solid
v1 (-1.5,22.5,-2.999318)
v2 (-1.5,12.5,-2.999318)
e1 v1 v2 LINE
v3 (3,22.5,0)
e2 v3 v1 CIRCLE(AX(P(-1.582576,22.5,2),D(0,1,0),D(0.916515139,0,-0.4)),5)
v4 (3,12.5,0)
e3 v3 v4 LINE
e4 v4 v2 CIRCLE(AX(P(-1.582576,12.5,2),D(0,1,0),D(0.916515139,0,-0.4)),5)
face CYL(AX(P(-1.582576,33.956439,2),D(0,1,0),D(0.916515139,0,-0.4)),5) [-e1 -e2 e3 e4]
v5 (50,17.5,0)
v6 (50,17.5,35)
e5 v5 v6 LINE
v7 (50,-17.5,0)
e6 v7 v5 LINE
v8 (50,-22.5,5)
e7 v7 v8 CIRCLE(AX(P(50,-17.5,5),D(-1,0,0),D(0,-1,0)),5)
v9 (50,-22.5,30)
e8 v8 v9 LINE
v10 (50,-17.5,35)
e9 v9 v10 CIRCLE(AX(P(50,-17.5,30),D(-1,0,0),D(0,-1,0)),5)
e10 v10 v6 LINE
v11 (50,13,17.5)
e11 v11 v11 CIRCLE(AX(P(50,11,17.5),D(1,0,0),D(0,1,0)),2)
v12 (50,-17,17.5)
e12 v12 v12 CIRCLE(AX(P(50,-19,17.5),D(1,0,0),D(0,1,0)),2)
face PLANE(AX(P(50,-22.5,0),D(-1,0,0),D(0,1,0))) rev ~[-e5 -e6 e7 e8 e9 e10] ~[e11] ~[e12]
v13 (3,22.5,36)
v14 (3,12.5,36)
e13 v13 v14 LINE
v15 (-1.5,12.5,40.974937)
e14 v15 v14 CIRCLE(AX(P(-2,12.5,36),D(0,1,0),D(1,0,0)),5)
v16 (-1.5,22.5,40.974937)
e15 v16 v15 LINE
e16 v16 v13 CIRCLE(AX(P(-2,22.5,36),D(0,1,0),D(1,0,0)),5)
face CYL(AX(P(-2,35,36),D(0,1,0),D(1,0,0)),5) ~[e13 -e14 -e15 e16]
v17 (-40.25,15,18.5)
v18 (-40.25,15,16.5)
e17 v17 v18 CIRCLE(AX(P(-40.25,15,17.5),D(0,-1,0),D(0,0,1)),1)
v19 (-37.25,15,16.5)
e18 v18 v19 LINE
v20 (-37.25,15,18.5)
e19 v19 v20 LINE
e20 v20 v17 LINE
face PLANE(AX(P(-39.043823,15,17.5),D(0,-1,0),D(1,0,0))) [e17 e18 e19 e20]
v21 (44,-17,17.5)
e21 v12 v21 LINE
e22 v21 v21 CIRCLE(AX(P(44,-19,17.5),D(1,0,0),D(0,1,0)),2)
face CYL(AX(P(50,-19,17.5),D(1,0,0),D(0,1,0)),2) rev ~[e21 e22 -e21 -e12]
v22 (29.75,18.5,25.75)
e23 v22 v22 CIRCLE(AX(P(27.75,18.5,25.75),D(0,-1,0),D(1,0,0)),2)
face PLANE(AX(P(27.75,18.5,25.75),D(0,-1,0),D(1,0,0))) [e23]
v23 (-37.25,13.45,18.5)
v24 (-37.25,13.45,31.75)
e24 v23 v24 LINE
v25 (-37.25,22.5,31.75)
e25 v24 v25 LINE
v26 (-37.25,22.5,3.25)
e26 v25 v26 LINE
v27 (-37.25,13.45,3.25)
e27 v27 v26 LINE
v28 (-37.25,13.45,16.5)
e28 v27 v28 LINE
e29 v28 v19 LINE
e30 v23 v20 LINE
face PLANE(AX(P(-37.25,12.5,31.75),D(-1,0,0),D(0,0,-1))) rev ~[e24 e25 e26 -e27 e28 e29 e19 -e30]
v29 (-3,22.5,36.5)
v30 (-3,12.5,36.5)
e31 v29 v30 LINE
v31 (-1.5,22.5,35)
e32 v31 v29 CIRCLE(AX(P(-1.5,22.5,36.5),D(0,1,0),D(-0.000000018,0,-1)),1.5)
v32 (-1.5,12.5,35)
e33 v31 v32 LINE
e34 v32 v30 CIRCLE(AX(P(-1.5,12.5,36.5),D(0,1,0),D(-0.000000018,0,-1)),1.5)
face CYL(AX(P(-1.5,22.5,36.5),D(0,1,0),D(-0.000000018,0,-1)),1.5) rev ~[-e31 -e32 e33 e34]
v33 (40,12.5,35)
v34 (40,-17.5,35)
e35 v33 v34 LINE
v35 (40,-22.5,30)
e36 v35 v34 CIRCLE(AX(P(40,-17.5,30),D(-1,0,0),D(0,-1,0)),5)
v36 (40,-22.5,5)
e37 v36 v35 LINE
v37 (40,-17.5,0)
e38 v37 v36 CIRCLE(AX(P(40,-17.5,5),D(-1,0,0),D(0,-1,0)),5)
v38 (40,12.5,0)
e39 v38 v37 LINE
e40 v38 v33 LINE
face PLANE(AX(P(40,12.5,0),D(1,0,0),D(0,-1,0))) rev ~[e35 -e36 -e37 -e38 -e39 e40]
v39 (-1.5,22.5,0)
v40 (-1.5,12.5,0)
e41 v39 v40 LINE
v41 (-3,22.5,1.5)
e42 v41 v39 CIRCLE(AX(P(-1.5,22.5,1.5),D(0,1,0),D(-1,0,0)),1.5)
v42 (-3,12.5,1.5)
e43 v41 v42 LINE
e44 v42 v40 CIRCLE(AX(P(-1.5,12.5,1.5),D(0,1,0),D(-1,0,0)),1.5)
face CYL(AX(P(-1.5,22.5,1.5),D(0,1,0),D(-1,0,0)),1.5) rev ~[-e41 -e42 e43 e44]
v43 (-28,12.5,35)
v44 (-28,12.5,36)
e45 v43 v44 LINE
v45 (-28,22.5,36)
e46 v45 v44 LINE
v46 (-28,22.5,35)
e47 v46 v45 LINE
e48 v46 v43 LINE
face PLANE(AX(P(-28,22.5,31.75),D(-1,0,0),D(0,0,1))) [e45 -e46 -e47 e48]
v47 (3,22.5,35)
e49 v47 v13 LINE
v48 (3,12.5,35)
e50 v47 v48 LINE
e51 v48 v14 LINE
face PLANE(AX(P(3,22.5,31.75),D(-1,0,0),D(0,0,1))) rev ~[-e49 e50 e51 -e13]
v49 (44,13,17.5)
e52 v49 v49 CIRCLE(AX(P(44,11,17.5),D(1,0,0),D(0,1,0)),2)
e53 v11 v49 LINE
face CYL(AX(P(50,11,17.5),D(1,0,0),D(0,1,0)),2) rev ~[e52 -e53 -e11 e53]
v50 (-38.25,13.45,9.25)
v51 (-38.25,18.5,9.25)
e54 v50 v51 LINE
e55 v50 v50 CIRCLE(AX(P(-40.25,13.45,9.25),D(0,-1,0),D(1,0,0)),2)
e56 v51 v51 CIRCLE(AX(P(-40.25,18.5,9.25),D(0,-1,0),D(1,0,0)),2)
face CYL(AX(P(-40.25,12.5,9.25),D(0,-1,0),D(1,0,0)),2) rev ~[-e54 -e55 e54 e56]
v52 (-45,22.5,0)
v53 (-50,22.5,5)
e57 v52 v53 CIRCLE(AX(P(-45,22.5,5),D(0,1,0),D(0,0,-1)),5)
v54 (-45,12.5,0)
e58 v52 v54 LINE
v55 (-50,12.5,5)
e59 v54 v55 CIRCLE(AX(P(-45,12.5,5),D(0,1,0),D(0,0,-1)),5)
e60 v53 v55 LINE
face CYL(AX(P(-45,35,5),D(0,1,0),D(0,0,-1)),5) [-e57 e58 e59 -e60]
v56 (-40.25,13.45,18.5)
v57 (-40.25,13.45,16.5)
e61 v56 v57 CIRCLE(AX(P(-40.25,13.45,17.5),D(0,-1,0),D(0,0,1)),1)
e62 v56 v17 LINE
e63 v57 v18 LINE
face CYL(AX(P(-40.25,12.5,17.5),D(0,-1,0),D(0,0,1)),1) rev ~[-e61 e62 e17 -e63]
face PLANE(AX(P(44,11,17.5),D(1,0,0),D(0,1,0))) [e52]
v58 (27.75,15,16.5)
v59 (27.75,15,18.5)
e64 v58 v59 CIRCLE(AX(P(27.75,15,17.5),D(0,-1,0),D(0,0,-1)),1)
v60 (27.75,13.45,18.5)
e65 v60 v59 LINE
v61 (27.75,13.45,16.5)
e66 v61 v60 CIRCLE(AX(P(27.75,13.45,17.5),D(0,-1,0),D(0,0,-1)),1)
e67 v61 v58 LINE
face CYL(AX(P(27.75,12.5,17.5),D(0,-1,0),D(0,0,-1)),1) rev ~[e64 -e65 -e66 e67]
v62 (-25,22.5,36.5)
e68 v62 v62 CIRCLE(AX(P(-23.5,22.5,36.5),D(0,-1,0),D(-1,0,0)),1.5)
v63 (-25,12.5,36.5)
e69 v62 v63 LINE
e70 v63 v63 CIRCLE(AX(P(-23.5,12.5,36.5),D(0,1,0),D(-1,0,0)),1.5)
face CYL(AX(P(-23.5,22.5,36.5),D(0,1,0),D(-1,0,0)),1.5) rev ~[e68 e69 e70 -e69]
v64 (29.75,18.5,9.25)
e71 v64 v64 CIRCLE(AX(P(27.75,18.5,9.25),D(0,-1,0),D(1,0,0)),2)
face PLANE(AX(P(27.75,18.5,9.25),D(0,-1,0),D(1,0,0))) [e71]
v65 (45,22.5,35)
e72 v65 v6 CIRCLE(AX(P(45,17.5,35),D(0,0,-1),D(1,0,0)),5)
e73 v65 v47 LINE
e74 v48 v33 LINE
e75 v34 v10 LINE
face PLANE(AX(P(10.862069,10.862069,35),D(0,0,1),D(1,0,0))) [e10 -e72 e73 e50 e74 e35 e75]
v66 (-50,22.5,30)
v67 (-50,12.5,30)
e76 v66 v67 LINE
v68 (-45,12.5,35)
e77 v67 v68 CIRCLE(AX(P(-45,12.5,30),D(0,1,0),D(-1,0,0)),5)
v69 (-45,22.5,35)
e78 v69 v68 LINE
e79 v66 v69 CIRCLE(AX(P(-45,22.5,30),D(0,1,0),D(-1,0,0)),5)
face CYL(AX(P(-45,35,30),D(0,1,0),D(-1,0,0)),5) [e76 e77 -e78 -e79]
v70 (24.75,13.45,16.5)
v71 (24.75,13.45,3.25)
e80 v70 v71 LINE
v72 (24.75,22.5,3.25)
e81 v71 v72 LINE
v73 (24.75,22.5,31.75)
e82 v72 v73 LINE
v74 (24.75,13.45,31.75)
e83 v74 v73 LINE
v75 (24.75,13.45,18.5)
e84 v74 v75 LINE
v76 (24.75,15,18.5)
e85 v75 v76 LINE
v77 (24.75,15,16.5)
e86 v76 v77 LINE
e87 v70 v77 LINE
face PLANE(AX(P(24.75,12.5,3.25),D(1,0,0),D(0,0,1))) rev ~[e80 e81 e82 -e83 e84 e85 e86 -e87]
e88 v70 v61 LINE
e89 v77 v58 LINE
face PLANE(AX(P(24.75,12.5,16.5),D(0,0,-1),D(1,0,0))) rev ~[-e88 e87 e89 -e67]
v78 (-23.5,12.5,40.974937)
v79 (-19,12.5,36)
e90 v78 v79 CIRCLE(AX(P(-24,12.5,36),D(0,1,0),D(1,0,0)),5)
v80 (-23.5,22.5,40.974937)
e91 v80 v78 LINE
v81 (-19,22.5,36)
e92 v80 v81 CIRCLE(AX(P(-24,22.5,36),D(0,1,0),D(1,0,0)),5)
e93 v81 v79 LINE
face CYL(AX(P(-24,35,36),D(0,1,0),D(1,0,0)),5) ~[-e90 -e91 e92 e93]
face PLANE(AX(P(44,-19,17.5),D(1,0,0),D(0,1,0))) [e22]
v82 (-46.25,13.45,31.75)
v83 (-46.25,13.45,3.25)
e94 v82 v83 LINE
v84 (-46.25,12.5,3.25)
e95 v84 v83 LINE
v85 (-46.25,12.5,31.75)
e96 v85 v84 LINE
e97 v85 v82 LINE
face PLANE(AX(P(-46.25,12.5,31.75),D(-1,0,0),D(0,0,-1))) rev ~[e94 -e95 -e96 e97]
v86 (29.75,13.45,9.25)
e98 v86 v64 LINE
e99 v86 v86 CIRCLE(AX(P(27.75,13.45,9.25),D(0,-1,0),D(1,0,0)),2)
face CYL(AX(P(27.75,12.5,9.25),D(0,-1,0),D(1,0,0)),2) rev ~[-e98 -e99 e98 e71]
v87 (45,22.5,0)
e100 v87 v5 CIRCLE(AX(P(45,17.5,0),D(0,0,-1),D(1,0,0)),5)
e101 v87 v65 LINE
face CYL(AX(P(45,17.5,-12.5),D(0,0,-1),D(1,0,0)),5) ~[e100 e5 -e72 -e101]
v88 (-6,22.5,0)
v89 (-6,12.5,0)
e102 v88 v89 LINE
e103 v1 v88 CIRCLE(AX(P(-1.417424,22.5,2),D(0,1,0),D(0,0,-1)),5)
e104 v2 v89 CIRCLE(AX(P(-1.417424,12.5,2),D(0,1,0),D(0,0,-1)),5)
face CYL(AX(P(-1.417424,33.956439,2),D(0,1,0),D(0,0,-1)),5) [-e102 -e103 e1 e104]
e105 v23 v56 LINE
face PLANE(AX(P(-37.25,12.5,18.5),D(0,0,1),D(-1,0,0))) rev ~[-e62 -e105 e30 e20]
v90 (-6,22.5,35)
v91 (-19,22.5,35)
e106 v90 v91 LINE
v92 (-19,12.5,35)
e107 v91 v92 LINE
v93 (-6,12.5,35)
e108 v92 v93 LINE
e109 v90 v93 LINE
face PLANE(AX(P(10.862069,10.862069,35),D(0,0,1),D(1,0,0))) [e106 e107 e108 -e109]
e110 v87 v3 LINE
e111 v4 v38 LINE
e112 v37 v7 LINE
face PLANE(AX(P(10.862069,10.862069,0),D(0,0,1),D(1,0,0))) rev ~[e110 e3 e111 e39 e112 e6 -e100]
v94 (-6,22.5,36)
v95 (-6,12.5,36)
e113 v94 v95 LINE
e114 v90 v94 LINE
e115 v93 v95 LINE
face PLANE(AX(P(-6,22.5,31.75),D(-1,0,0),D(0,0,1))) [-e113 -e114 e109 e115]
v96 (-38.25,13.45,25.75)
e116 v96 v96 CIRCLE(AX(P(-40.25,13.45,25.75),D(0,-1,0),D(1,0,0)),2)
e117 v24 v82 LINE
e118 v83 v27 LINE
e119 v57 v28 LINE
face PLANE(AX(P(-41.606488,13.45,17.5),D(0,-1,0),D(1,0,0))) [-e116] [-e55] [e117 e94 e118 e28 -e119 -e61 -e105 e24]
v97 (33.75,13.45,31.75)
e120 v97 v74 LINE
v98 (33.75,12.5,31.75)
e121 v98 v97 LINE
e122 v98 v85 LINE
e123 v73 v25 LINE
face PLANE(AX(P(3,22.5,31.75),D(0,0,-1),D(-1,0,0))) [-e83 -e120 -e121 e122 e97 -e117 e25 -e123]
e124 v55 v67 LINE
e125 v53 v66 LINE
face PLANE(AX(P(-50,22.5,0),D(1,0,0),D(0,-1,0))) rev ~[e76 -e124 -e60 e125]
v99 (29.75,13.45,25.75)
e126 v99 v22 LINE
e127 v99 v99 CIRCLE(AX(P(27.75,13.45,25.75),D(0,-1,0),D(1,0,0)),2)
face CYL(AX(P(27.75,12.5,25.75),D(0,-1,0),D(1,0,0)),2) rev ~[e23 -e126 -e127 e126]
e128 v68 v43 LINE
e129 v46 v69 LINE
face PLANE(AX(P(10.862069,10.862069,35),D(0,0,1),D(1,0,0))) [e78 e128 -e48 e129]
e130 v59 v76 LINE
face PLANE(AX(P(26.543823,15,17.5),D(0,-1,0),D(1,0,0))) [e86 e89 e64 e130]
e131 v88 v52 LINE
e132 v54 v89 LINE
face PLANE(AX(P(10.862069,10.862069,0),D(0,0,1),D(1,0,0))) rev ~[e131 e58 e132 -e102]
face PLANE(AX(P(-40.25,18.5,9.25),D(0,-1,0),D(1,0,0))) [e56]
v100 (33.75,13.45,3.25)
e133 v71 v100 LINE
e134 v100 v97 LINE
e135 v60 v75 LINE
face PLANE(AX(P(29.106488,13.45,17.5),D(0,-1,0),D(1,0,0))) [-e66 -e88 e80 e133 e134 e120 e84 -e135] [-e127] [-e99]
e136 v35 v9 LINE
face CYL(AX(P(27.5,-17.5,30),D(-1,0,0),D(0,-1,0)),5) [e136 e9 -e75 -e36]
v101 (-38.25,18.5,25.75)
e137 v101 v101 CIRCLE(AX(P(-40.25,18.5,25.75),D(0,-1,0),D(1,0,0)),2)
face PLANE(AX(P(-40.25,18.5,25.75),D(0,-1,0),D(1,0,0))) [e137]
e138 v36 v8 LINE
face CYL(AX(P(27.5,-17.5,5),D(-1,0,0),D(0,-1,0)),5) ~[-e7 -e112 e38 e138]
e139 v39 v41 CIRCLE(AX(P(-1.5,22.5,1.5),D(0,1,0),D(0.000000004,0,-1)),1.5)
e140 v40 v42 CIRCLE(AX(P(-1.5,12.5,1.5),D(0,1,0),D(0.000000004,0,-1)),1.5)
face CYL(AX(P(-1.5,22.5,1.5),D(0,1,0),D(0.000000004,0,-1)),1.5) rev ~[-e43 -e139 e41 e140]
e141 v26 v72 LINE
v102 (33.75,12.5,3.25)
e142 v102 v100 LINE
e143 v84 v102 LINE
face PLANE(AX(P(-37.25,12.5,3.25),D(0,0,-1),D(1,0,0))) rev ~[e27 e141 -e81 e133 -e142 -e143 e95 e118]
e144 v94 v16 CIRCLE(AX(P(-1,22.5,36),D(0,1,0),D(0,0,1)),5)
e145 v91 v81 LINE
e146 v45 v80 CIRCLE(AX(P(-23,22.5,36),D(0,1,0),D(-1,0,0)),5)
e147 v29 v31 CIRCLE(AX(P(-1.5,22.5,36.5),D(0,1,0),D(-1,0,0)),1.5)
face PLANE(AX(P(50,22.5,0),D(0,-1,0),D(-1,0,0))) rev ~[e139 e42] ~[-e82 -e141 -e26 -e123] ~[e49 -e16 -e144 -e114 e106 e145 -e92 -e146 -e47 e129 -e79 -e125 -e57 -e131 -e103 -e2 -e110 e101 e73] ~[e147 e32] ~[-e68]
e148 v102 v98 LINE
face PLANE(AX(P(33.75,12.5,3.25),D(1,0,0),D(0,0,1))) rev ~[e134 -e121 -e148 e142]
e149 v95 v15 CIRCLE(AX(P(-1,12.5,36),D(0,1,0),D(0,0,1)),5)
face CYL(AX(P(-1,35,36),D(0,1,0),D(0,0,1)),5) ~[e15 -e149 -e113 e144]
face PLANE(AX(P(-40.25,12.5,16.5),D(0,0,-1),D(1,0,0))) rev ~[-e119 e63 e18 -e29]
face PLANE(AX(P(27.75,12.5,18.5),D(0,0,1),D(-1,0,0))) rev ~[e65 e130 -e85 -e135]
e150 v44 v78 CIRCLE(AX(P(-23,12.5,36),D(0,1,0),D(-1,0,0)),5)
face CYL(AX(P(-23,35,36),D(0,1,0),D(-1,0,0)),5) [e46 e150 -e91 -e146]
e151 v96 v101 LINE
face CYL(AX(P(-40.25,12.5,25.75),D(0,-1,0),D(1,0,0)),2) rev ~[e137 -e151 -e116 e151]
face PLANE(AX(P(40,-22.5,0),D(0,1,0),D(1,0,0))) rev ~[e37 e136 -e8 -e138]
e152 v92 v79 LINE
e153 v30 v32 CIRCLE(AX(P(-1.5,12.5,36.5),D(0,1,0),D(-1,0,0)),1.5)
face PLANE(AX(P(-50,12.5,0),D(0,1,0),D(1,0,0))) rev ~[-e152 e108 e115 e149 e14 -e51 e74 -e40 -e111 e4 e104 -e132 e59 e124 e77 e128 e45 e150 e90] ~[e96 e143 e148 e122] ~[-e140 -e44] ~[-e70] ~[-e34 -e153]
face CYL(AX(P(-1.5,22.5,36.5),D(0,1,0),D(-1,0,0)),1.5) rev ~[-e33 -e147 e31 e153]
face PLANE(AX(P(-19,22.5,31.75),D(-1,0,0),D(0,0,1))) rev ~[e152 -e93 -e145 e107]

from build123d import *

# Parameters (mm, degrees)
F2_DEPTH     = 35
F4_DEPTH     = 10
F3_R         = 2
F5_DEPTH     = 0.95
F6_DEPTH     = 2.5
F7_DEPTH     = 6
F8_W         = 9
F8_H         = 9.25
F8_R         = 1.5
F8_H_2       = 6.25
F9_DEPTH     = 10
F10_DEPTH    = 10
F11_R        = 2
F12_DEPTH    = 6
F13_T1_DEPTH = 35
F13_T3_DEPTH = 35
F13_T5_DEPTH = 60
F13_T7_DEPTH = 32.9128784748


# Not quite as in the source:
# - a fillet or chamfer that OpenCascade refuses, or shapes differently, is made with other operations: its cross-section is extruded or revolved along the edge and cut away or added


with BuildPart() as f2:
    # F1 (on Top) → F2 (new body)
    with BuildSketch(Plane.XY):
        Polygon((50, -22.5), (50, 22.5), (-50, 22.5), (-50, 12.5), (40, 12.5), (40, -22.5), align=None)
    extrude(amount=F2_DEPTH)

    # F3 (on face) → F4 (cut, through all)
    with BuildSketch(Plane.XZ.offset(-12.5)):
        with BuildLine():
            Line((-37.25, 3.25), (24.75, 3.25))
            Line((24.75, 3.25), (24.75, 16.5))
            ThreePointArc((24.75, 16.5), (23.75, 17.5), (24.75, 18.5))
            Line((24.75, 18.5), (24.75, 31.75))
            Line((24.75, 31.75), (-37.25, 31.75))
            Line((-37.25, 31.75), (-37.25, 18.5))
            ThreePointArc((-37.25, 18.5), (-36.25, 17.5), (-37.25, 16.5))
            Line((-37.25, 16.5), (-37.25, 3.25))
        make_face()
        with BuildLine():
            Line((-37.25, 17.5), (-37.25, 16.5))
            ThreePointArc((-37.25, 16.5), (-36.25, 17.5), (-37.25, 18.5))
            Line((-37.25, 18.5), (-37.25, 17.5))
        make_face()
        with BuildLine():
            ThreePointArc((24.75, 18.5), (23.75, 17.5), (24.75, 16.5))
            Line((24.75, 16.5), (24.75, 17.5))
            Line((24.75, 17.5), (24.75, 18.5))
        make_face()
    extrude(amount=-F4_DEPTH, mode=Mode.SUBTRACT)

    # F3 (on face) → F5 (cut)
    with BuildSketch(Plane.XZ.offset(-12.5)):
        with BuildLine():
            Line((-43.25, 3.25), (-37.25, 3.25))
            Line((-37.25, 3.25), (-37.25, 16.5))
            Line((-37.25, 16.5), (-40.25, 16.5))
            ThreePointArc((-40.25, 16.5), (-41.25, 17.5), (-40.25, 18.5))
            Line((-40.25, 18.5), (-37.25, 18.5))
            Line((-37.25, 18.5), (-37.25, 31.75))
            Line((-37.25, 31.75), (-43.25, 31.75))
            Line((-43.25, 31.75), (-46.25, 31.75))
            Line((-46.25, 31.75), (-46.25, 3.25))
            Line((-46.25, 3.25), (-43.25, 3.25))
        make_face()
        with Locations((-40.25, 9.25)):
            Circle(F3_R, mode=Mode.SUBTRACT)
        with Locations((-40.25, 25.75)):
            Circle(F3_R, mode=Mode.SUBTRACT)
        with BuildLine():
            Line((27.75, 3.25), (30.75, 3.25))
            Line((30.75, 3.25), (33.75, 3.25))
            Line((33.75, 3.25), (33.75, 31.75))
            Line((33.75, 31.75), (30.75, 31.75))
            Line((30.75, 31.75), (24.75, 31.75))
            Line((24.75, 31.75), (24.75, 18.5))
            Line((24.75, 18.5), (27.75, 18.5))
            ThreePointArc((27.75, 18.5), (28.75, 17.5), (27.75, 16.5))
            Line((27.75, 16.5), (24.75, 16.5))
            Line((24.75, 16.5), (24.75, 3.25))
            Line((24.75, 3.25), (27.75, 3.25))
        make_face()
        with Locations((27.75, 9.25)):
            Circle(F3_R, mode=Mode.SUBTRACT)
        with Locations((27.75, 25.75)):
            Circle(F3_R, mode=Mode.SUBTRACT)
        with BuildLine():
            Line((-40.25, 16.5), (-37.25, 16.5))
            Line((-37.25, 16.5), (-37.25, 17.5))
            Line((-37.25, 17.5), (-37.25, 18.5))
            Line((-37.25, 18.5), (-40.25, 18.5))
            ThreePointArc((-40.25, 18.5), (-41.25, 17.5), (-40.25, 16.5))
        make_face()
        with BuildLine():
            Line((24.75, 17.5), (24.75, 16.5))
            Line((24.75, 16.5), (27.75, 16.5))
            ThreePointArc((27.75, 16.5), (28.75, 17.5), (27.75, 18.5))
            Line((27.75, 18.5), (24.75, 18.5))
            Line((24.75, 18.5), (24.75, 17.5))
        make_face()
    extrude(amount=-F5_DEPTH, mode=Mode.SUBTRACT)

    # F3 (on face) → F6 (cut)
    with BuildSketch(Plane.XZ.offset(-12.5)):
        with BuildLine():
            Line((-40.25, 16.5), (-37.25, 16.5))
            Line((-37.25, 16.5), (-37.25, 17.5))
            Line((-37.25, 17.5), (-37.25, 18.5))
            Line((-37.25, 18.5), (-40.25, 18.5))
            ThreePointArc((-40.25, 18.5), (-41.25, 17.5), (-40.25, 16.5))
        make_face()
        with BuildLine():
            Line((24.75, 17.5), (24.75, 16.5))
            Line((24.75, 16.5), (27.75, 16.5))
            ThreePointArc((27.75, 16.5), (28.75, 17.5), (27.75, 18.5))
            Line((27.75, 18.5), (24.75, 18.5))
            Line((24.75, 18.5), (24.75, 17.5))
        make_face()
    extrude(amount=-F6_DEPTH, mode=Mode.SUBTRACT)

    # F3 (on face) → F7 (cut)
    with BuildSketch(Plane.XZ.offset(-12.5)):
        with Locations((-40.25, 25.75)):
            Circle(F3_R)
        with Locations((-40.25, 9.25)):
            Circle(F3_R)
        with Locations((27.75, 9.25)):
            Circle(F3_R)
        with Locations((27.75, 25.75)):
            Circle(F3_R)
    extrude(amount=-F7_DEPTH, mode=Mode.SUBTRACT)

    # F8 (on face) → F9 (join, through all)
    with BuildSketch(Plane(origin=(0, 22.5, 0), x_dir=(-1, 0, 0), z_dir=(0, 1, 0))):
        with Locations((1.5, 36.375)):
            Rectangle(F8_W, F8_H)
        with Locations((1.5, 36.5)):
            Circle(F8_R, mode=Mode.SUBTRACT)
        with Locations((1.5, 0.125)):
            Rectangle(F8_W, F8_H_2)
        with Locations((1.5, 1.5)):
            Circle(F8_R, mode=Mode.SUBTRACT)
        with Locations((23.5, 36.375)):
            Rectangle(F8_W, F8_H)
        with Locations((23.5, 36.5)):
            Circle(F8_R, mode=Mode.SUBTRACT)
        with BuildLine():
            ThreePointArc((3, 36.5), (0.4393398187, 37.5606601622), (1.5000000271, 35))
            ThreePointArc((1.5000000271, 35), (2.5606601813, 35.4393398378), (3, 36.5))
        make_face()
    extrude(amount=-F9_DEPTH)

    # F8 (on face) → F10 (cut, through all)
    with BuildSketch(Plane(origin=(0, 22.5, 0), x_dir=(-1, 0, 0), z_dir=(0, 1, 0))):
        with BuildLine():
            ThreePointArc((3, 1.5), (0.4393398305, 2.560660174), (1.4999999936, 0))
            ThreePointArc((1.4999999936, 0), (2.5606601695, 0.439339826), (3, 1.5))
        make_face()
        with BuildLine():
            ThreePointArc((3, 36.5), (0.4393398187, 37.5606601622), (1.5000000271, 35))
            ThreePointArc((1.5000000271, 35), (2.5606601813, 35.4393398378), (3, 36.5))
        make_face()
    extrude(amount=-F10_DEPTH, mode=Mode.SUBTRACT)

    # F11 (on face) → F12 (cut)
    with BuildSketch(Plane.YZ.offset(50)):
        with Locations((-19, 17.5)):
            Circle(F11_R)
        with Locations((11, 17.5)):
            Circle(F11_R)
    extrude(amount=-F12_DEPTH, mode=Mode.SUBTRACT)

    # F13: fillet of radius 5 on 11 edges, made by hand

    # F13_s2 → F13_t1 (cut)
    with BuildSketch(Plane.XZ.offset(-35)):
        with BuildLine():
            ThreePointArc((-50, 30), (-48.5355339059, 33.5355339059), (-45, 35))
            Line((-45, 35), (-50, 35))
            Line((-50, 35), (-50, 30))
        make_face()
        with BuildLine():
            ThreePointArc((-45, 0), (-48.5355339059, 1.4644660941), (-50, 5))
            Line((-50, 5), (-50, 0))
            Line((-50, 0), (-45, 0))
        make_face()
        with BuildLine():
            ThreePointArc((-1, 41), (-4.5355339059, 39.5355339059), (-6, 36))
            Line((-6, 36), (-6, 41))
            Line((-6, 41), (-1, 41))
        make_face()
        with BuildLine():
            ThreePointArc((3, 36), (1.5355339059, 39.5355339059), (-2, 41))
            Line((-2, 41), (3, 41))
            Line((3, 41), (3, 36))
        make_face()
        with BuildLine():
            ThreePointArc((-28, 36), (-26.5355339059, 39.5355339059), (-23, 41))
            Line((-23, 41), (-28, 41))
            Line((-28, 41), (-28, 36))
        make_face()
        with BuildLine():
            ThreePointArc((-19, 36), (-20.4644660941, 39.5355339059), (-24, 41))
            Line((-24, 41), (-19, 41))
            Line((-19, 41), (-19, 36))
        make_face()
    extrude(amount=F13_T1_DEPTH, mode=Mode.SUBTRACT)

    # F13_s4 → F13_t3 (cut)
    with BuildSketch(Plane.YZ.offset(27.5)):
        with BuildLine():
            ThreePointArc((-22.5, 30), (-21.0355339059, 33.5355339059), (-17.5, 35))
            Line((-17.5, 35), (-22.5, 35))
            Line((-22.5, 35), (-22.5, 30))
        make_face()
        with BuildLine():
            ThreePointArc((-22.5, 5), (-21.0355339059, 1.4644660941), (-17.5, 0))
            Line((-17.5, 0), (-22.5, 0))
            Line((-22.5, 0), (-22.5, 5))
        make_face()
    extrude(amount=F13_T3_DEPTH, mode=Mode.SUBTRACT)

    # F13_s6 → F13_t5 (cut)
    with BuildSketch(Plane.XY.offset(-12.5)):
        with BuildLine():
            ThreePointArc((50, 17.5), (48.5355339059, 21.0355339059), (45, 22.5))
            Line((45, 22.5), (50, 22.5))
            Line((50, 22.5), (50, 17.5))
        make_face()
    extrude(amount=F13_T5_DEPTH, mode=Mode.SUBTRACT)

    # F13_s8 → F13_t7 (cut)
    with BuildSketch(Plane.XZ.offset(-33.9564392374)):
        with BuildLine():
            ThreePointArc((3, 0), (1.1560370926, -2.1833001327), (-1.582575695, -3))
            Line((-1.582575695, -3), (3, -3))
            Line((3, -3), (3, 0))
        make_face()
        with BuildLine():
            ThreePointArc((-1.417424305, -3), (-4.1560370926, -2.1833001327), (-6, 0))
            Line((-6, 0), (-6, -3))
            Line((-6, -3), (-1.417424305, -3))
        make_face()
    extrude(amount=F13_T7_DEPTH, mode=Mode.SUBTRACT)


solid = f2.part
